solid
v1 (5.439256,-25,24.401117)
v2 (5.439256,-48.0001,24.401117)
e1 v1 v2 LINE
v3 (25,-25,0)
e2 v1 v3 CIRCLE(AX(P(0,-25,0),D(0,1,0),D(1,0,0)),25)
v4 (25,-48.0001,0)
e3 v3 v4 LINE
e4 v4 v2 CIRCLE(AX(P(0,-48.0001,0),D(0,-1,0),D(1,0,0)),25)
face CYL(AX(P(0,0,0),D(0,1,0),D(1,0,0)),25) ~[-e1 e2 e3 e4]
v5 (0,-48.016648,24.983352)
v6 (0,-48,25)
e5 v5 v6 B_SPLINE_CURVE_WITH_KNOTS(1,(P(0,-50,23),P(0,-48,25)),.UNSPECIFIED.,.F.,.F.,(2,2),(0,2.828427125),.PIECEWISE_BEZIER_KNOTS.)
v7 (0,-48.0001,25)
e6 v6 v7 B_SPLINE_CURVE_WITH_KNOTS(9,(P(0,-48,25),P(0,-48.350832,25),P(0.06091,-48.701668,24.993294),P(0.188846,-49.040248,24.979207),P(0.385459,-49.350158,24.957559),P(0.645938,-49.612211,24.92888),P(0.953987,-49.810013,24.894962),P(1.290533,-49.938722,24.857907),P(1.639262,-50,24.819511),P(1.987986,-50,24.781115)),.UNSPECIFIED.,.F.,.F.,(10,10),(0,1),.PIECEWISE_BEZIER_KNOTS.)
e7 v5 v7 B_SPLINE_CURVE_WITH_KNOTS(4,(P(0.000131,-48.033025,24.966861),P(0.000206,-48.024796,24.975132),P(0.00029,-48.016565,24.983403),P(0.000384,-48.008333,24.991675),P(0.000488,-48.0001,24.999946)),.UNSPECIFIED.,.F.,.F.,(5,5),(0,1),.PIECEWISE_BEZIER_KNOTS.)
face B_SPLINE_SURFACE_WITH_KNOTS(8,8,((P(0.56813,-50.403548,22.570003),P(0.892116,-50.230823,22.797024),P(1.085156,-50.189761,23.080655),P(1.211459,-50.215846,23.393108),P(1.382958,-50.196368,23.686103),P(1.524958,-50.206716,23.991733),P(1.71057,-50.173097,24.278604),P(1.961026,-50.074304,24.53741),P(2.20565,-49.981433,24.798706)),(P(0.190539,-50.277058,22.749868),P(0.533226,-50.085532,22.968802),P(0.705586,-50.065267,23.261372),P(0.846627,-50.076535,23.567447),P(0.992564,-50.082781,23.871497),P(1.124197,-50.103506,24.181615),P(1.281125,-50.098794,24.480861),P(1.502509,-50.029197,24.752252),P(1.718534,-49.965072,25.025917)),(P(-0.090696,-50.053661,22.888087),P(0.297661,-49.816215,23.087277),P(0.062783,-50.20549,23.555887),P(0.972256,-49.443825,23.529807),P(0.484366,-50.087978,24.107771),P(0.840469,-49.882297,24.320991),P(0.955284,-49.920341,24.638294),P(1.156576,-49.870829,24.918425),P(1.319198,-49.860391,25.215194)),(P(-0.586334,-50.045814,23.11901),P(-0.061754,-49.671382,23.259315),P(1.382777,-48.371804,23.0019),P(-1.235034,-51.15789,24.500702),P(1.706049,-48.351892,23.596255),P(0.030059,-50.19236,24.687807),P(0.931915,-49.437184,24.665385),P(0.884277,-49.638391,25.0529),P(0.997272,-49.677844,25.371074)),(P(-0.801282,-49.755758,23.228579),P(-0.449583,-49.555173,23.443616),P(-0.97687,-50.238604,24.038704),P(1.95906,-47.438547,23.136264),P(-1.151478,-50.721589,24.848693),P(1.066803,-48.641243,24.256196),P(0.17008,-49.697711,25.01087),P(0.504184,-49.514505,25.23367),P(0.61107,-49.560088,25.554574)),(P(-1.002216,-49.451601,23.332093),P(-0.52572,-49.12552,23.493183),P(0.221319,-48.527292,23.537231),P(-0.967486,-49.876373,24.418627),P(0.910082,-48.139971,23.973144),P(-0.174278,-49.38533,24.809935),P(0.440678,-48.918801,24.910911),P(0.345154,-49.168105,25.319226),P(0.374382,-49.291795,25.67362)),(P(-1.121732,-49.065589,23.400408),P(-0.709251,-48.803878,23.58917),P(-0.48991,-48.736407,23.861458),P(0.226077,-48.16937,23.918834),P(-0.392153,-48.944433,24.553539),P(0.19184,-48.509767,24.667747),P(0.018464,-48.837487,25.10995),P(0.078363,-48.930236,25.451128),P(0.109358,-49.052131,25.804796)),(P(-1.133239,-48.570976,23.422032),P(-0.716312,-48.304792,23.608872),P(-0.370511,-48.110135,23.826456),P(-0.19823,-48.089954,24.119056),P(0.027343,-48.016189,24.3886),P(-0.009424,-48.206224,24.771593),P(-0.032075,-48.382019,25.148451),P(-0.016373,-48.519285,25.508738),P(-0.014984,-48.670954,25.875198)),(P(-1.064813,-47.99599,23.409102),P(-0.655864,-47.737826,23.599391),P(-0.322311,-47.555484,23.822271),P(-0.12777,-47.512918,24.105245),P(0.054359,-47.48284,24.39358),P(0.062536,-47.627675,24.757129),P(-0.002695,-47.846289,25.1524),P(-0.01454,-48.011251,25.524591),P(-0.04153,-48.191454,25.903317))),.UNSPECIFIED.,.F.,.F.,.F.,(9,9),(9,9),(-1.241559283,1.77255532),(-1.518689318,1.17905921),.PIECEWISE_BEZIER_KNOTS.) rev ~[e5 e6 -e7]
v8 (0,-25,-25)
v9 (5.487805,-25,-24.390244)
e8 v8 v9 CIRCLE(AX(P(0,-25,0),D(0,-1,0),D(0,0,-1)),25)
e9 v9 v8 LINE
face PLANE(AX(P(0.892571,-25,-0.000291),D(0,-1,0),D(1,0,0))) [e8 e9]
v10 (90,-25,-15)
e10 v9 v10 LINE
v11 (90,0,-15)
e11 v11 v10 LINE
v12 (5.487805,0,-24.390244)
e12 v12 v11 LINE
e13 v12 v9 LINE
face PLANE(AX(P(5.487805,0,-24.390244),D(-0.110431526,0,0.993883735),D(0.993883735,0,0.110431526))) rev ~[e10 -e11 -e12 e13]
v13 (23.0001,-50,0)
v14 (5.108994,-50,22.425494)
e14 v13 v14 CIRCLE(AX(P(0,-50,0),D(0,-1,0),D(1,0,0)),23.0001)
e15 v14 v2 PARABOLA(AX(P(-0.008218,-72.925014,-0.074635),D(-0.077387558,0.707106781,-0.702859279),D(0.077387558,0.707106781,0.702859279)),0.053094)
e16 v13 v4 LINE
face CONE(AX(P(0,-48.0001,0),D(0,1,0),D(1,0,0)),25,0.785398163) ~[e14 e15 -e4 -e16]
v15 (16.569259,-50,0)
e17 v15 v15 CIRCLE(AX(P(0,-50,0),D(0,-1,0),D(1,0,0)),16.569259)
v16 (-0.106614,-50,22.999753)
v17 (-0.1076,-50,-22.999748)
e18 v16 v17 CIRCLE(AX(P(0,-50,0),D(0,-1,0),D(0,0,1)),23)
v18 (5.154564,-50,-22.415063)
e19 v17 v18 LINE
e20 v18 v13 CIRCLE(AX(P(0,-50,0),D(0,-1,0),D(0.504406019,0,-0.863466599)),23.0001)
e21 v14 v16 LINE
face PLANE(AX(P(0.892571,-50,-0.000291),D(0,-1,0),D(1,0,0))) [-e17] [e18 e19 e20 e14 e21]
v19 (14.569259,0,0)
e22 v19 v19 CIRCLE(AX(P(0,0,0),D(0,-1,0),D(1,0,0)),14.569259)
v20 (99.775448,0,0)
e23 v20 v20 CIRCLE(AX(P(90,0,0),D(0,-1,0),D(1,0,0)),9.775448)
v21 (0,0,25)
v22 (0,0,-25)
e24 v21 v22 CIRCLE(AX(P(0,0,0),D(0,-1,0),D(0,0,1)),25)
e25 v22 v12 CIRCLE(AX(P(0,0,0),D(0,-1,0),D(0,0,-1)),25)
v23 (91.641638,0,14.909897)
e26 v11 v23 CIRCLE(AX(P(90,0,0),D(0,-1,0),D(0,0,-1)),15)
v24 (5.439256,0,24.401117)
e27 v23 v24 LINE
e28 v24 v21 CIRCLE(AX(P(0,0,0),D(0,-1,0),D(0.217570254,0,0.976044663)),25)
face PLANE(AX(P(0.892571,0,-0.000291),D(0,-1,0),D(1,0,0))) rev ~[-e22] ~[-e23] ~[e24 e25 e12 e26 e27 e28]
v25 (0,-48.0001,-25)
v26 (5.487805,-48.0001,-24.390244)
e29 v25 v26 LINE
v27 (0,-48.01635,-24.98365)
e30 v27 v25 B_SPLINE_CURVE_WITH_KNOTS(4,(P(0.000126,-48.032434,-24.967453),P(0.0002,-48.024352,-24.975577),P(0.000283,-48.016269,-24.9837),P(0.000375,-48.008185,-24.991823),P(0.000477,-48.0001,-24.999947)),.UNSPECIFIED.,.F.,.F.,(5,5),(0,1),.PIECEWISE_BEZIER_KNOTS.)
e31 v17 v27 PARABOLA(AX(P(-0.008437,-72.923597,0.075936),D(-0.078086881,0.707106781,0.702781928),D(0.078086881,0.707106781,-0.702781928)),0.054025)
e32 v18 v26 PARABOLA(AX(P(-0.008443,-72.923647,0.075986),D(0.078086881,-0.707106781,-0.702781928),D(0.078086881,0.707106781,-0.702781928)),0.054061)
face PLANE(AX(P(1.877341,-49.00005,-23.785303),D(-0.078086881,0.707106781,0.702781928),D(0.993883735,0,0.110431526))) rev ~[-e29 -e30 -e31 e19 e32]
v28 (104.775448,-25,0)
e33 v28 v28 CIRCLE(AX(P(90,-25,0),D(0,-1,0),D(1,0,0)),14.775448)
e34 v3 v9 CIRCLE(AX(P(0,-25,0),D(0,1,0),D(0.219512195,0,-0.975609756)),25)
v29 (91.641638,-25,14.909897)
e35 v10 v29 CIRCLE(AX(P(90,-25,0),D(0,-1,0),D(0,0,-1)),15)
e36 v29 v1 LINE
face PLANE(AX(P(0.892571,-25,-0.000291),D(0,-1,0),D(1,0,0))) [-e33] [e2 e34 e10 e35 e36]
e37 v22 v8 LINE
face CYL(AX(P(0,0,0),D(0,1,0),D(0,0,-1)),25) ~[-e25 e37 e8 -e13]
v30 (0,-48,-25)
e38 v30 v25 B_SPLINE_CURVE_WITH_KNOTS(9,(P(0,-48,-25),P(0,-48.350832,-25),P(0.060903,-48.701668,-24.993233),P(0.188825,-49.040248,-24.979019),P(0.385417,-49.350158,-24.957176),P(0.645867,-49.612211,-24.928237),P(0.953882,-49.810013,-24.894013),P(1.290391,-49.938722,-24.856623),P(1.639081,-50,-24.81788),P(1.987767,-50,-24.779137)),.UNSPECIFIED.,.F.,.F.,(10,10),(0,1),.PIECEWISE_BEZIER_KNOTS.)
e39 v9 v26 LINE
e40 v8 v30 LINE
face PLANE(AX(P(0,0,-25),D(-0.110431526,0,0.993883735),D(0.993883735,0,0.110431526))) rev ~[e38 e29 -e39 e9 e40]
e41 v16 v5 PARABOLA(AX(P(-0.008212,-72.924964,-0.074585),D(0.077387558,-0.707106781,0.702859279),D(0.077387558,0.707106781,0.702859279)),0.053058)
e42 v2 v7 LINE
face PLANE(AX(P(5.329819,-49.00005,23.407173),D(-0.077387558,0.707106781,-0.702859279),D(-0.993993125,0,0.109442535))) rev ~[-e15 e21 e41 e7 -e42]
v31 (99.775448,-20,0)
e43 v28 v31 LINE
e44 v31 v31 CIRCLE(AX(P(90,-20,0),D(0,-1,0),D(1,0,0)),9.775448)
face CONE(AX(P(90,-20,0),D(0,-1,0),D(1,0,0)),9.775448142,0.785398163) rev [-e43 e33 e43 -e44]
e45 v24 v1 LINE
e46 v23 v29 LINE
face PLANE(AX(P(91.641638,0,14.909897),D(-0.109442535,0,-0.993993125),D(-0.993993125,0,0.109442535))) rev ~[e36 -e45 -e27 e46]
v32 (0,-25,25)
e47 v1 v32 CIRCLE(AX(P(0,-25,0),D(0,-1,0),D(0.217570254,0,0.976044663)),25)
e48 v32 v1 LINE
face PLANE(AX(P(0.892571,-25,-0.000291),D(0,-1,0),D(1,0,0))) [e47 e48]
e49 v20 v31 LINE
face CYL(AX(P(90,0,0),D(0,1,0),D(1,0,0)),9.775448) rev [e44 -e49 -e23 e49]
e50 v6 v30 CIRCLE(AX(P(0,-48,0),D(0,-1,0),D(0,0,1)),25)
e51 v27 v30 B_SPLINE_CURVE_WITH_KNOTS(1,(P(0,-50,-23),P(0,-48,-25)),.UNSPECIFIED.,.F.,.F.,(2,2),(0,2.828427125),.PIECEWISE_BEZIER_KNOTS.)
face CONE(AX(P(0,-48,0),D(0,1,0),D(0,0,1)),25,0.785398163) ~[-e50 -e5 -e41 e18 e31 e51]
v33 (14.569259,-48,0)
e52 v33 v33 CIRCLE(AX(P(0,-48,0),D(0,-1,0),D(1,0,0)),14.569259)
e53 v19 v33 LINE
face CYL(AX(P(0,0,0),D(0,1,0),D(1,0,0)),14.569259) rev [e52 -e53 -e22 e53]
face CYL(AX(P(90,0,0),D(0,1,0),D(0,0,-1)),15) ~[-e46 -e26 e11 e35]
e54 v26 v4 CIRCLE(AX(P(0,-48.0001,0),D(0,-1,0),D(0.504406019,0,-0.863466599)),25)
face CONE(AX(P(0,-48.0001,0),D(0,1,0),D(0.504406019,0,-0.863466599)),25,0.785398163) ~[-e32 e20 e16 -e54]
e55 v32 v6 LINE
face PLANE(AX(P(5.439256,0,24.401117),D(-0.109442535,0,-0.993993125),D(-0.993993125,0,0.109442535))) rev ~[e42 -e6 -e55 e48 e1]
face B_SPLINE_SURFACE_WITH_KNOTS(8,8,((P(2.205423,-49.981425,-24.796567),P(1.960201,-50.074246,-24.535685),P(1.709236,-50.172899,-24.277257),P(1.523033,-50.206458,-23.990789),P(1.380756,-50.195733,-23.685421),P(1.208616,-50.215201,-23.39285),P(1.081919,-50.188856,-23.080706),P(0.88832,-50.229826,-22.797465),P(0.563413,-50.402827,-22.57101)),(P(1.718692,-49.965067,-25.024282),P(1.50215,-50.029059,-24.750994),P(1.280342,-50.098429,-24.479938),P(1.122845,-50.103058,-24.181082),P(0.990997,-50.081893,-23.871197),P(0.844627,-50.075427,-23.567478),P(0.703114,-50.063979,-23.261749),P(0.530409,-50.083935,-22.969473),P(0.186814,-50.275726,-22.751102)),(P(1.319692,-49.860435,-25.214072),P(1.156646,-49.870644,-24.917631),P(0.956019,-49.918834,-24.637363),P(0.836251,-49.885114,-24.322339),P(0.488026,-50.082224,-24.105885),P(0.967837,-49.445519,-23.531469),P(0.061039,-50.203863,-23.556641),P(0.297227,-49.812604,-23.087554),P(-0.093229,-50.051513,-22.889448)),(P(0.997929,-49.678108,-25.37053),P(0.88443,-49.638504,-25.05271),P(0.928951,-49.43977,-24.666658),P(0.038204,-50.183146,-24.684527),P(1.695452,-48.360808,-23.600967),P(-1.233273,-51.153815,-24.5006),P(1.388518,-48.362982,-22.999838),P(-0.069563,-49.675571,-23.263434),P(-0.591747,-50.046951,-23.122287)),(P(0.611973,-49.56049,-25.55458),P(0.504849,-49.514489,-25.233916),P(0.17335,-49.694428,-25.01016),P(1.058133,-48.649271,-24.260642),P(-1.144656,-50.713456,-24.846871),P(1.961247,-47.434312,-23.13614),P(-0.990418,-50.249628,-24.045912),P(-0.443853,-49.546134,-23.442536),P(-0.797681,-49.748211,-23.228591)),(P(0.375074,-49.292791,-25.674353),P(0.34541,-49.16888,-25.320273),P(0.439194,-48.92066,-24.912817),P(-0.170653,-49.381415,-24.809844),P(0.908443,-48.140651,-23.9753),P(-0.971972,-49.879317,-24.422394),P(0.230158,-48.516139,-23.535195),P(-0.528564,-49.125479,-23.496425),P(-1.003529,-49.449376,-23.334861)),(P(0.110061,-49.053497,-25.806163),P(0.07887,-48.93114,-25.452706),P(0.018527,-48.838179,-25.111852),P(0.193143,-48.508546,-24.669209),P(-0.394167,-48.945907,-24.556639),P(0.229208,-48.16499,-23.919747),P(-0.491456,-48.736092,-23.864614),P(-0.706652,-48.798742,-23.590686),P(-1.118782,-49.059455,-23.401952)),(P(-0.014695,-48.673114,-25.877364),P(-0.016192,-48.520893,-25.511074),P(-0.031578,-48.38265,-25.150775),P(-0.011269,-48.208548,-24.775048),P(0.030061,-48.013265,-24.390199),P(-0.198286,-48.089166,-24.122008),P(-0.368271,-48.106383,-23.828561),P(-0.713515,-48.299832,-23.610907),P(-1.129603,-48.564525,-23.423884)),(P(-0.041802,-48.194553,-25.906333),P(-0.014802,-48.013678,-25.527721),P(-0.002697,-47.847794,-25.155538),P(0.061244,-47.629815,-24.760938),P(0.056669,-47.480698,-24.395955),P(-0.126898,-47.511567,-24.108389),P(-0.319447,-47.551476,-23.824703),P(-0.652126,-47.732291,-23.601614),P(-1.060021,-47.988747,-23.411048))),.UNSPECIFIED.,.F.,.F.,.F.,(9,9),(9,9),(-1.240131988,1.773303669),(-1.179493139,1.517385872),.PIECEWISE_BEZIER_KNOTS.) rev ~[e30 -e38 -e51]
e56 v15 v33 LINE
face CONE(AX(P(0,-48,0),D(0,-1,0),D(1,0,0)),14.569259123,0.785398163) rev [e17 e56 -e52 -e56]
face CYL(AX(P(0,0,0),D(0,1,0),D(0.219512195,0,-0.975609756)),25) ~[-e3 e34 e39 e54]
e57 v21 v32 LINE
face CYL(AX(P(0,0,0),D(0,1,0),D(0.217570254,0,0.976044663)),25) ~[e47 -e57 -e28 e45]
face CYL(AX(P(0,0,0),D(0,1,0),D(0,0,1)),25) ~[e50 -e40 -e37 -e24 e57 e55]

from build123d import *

# Parameters (mm, degrees)
F0_R       = 14.5692591233
F0_R_2     = 9.7754481422
F1_DEPTH   = 25
F2_DEPTH   = 50
F3_C1_SIZE = 2
F3_C2_SIZE = 2
F3_C3_SIZE = 1.9999
F3_C4_SIZE = 1.9999
F3_C5_SIZE = 1.9999
F4_SIZE    = 5


# Not quite as in the source:
# - a fillet or chamfer is up to 0.001 mm smaller than in the source, because OpenCascade refuses the exact size


with BuildPart() as f1:
    # F0 (on Front) → F1 (new body)
    with BuildSketch(Plane.XZ):
        with BuildLine():
            Line((5.4392563459, 24.4011165811), (0, 25))
            ThreePointArc((0, 25), (-25, 0), (0, -25))
            Line((0, -25), (5.487804878, -24.3902439024))
            ThreePointArc((5.487804878, -24.3902439024), (19.5217202361, -15.6173761889), (25, 0))
            ThreePointArc((25, 0), (19.5061709293, 15.6367930113), (5.4392563459, 24.4011165811))
        make_face()
        Circle(F0_R, mode=Mode.SUBTRACT)
        with BuildLine():
            ThreePointArc((5.4392563459, 24.4011165811), (2.7360633648, 24.8498281134), (0, 25))
            Line((0, 25), (5.4392563459, 24.4011165811))
        make_face()
        with BuildLine():
            Line((5.487804878, -24.3902439024), (0, -25))
            ThreePointArc((0, -25), (2.7607881519, -24.8470933668), (5.487804878, -24.3902439024))
        make_face()
        with BuildLine():
            Line((91.6416380189, 14.909896868), (5.4392563459, 24.4011165811))
            ThreePointArc((5.4392563459, 24.4011165811), (19.5061709293, 15.6367930113), (25, 0))
            ThreePointArc((25, 0), (19.5217202361, -15.6173761889), (5.487804878, -24.3902439024))
            Line((5.487804878, -24.3902439024), (90, -15))
            ThreePointArc((90, -15), (75.0225427221, 0.8220544324), (91.6416380189, 14.909896868))
        make_face()
        with BuildLine():
            ThreePointArc((105, 0), (101.1719418698, 10.0093813424), (91.6416380189, 14.909896868))
            ThreePointArc((91.6416380189, 14.909896868), (75.0225427221, 0.8220544324), (90, -15))
            ThreePointArc((90, -15), (100.6066017178, -10.6066017178), (105, 0))
        make_face()
        with Locations((90, 0)):
            Circle(F0_R_2, mode=Mode.SUBTRACT)
    extrude(amount=F1_DEPTH)

    # F0 (on Front) → F2 (join)
    with BuildSketch(Plane.XZ):
        with BuildLine():
            Line((5.4392563459, 24.4011165811), (0, 25))
            ThreePointArc((0, 25), (-25, 0), (0, -25))
            Line((0, -25), (5.487804878, -24.3902439024))
            ThreePointArc((5.487804878, -24.3902439024), (19.5217202361, -15.6173761889), (25, 0))
            ThreePointArc((25, 0), (19.5061709293, 15.6367930113), (5.4392563459, 24.4011165811))
        make_face()
        Circle(F0_R, mode=Mode.SUBTRACT)
    extrude(amount=F2_DEPTH)

    # F3: chamfer of 2 on 5 edges, made by hand

    # F3_c1
    f3_c1_edges = [f1.edges().sort_by_distance(p)[0] for p in [
        (-14.5692591233, -50, 0),
    ]]
    chamfer(f3_c1_edges, length=F3_C1_SIZE)

    # F3_c2
    f3_c2_edges = [f1.edges().sort_by_distance(p)[0] for p in [
        (-25, -50, 0),
    ]]
    chamfer(f3_c2_edges, length=F3_C2_SIZE)

    # F3_c3 (size 2 in the source; OpenCascade refuses exactly that, so slightly less here)
    f3_c3_edges = [f1.edges().sort_by_distance(p)[0] for p in [
        (3.7377861737, -50, -24.5846904251),
    ]]
    chamfer(f3_c3_edges, length=F3_C3_SIZE)

    # F3_c4 (size 2 in the source; OpenCascade refuses exactly that, so slightly less here)
    f3_c4_edges = [f1.edges().sort_by_distance(p)[0] for p in [
        (3.7136212975, -50, 24.591115756),
    ]]
    chamfer(f3_c4_edges, length=F3_C4_SIZE)

    # F3_c5 (size 2 in the source; OpenCascade refuses exactly that, so slightly less here)
    f3_c5_edges = [f1.edges().sort_by_distance(p)[0] for p in [
        (24.9999950028, -50, 0.0158069943),
    ]]
    chamfer(f3_c5_edges, length=F3_C5_SIZE)

    # F4
    f4_edges = [f1.edges().sort_by_distance(p)[0] for p in [
        (80.224552, -25, 0),
    ]]
    chamfer(f4_edges, length=F4_SIZE)


solid = f1.part
